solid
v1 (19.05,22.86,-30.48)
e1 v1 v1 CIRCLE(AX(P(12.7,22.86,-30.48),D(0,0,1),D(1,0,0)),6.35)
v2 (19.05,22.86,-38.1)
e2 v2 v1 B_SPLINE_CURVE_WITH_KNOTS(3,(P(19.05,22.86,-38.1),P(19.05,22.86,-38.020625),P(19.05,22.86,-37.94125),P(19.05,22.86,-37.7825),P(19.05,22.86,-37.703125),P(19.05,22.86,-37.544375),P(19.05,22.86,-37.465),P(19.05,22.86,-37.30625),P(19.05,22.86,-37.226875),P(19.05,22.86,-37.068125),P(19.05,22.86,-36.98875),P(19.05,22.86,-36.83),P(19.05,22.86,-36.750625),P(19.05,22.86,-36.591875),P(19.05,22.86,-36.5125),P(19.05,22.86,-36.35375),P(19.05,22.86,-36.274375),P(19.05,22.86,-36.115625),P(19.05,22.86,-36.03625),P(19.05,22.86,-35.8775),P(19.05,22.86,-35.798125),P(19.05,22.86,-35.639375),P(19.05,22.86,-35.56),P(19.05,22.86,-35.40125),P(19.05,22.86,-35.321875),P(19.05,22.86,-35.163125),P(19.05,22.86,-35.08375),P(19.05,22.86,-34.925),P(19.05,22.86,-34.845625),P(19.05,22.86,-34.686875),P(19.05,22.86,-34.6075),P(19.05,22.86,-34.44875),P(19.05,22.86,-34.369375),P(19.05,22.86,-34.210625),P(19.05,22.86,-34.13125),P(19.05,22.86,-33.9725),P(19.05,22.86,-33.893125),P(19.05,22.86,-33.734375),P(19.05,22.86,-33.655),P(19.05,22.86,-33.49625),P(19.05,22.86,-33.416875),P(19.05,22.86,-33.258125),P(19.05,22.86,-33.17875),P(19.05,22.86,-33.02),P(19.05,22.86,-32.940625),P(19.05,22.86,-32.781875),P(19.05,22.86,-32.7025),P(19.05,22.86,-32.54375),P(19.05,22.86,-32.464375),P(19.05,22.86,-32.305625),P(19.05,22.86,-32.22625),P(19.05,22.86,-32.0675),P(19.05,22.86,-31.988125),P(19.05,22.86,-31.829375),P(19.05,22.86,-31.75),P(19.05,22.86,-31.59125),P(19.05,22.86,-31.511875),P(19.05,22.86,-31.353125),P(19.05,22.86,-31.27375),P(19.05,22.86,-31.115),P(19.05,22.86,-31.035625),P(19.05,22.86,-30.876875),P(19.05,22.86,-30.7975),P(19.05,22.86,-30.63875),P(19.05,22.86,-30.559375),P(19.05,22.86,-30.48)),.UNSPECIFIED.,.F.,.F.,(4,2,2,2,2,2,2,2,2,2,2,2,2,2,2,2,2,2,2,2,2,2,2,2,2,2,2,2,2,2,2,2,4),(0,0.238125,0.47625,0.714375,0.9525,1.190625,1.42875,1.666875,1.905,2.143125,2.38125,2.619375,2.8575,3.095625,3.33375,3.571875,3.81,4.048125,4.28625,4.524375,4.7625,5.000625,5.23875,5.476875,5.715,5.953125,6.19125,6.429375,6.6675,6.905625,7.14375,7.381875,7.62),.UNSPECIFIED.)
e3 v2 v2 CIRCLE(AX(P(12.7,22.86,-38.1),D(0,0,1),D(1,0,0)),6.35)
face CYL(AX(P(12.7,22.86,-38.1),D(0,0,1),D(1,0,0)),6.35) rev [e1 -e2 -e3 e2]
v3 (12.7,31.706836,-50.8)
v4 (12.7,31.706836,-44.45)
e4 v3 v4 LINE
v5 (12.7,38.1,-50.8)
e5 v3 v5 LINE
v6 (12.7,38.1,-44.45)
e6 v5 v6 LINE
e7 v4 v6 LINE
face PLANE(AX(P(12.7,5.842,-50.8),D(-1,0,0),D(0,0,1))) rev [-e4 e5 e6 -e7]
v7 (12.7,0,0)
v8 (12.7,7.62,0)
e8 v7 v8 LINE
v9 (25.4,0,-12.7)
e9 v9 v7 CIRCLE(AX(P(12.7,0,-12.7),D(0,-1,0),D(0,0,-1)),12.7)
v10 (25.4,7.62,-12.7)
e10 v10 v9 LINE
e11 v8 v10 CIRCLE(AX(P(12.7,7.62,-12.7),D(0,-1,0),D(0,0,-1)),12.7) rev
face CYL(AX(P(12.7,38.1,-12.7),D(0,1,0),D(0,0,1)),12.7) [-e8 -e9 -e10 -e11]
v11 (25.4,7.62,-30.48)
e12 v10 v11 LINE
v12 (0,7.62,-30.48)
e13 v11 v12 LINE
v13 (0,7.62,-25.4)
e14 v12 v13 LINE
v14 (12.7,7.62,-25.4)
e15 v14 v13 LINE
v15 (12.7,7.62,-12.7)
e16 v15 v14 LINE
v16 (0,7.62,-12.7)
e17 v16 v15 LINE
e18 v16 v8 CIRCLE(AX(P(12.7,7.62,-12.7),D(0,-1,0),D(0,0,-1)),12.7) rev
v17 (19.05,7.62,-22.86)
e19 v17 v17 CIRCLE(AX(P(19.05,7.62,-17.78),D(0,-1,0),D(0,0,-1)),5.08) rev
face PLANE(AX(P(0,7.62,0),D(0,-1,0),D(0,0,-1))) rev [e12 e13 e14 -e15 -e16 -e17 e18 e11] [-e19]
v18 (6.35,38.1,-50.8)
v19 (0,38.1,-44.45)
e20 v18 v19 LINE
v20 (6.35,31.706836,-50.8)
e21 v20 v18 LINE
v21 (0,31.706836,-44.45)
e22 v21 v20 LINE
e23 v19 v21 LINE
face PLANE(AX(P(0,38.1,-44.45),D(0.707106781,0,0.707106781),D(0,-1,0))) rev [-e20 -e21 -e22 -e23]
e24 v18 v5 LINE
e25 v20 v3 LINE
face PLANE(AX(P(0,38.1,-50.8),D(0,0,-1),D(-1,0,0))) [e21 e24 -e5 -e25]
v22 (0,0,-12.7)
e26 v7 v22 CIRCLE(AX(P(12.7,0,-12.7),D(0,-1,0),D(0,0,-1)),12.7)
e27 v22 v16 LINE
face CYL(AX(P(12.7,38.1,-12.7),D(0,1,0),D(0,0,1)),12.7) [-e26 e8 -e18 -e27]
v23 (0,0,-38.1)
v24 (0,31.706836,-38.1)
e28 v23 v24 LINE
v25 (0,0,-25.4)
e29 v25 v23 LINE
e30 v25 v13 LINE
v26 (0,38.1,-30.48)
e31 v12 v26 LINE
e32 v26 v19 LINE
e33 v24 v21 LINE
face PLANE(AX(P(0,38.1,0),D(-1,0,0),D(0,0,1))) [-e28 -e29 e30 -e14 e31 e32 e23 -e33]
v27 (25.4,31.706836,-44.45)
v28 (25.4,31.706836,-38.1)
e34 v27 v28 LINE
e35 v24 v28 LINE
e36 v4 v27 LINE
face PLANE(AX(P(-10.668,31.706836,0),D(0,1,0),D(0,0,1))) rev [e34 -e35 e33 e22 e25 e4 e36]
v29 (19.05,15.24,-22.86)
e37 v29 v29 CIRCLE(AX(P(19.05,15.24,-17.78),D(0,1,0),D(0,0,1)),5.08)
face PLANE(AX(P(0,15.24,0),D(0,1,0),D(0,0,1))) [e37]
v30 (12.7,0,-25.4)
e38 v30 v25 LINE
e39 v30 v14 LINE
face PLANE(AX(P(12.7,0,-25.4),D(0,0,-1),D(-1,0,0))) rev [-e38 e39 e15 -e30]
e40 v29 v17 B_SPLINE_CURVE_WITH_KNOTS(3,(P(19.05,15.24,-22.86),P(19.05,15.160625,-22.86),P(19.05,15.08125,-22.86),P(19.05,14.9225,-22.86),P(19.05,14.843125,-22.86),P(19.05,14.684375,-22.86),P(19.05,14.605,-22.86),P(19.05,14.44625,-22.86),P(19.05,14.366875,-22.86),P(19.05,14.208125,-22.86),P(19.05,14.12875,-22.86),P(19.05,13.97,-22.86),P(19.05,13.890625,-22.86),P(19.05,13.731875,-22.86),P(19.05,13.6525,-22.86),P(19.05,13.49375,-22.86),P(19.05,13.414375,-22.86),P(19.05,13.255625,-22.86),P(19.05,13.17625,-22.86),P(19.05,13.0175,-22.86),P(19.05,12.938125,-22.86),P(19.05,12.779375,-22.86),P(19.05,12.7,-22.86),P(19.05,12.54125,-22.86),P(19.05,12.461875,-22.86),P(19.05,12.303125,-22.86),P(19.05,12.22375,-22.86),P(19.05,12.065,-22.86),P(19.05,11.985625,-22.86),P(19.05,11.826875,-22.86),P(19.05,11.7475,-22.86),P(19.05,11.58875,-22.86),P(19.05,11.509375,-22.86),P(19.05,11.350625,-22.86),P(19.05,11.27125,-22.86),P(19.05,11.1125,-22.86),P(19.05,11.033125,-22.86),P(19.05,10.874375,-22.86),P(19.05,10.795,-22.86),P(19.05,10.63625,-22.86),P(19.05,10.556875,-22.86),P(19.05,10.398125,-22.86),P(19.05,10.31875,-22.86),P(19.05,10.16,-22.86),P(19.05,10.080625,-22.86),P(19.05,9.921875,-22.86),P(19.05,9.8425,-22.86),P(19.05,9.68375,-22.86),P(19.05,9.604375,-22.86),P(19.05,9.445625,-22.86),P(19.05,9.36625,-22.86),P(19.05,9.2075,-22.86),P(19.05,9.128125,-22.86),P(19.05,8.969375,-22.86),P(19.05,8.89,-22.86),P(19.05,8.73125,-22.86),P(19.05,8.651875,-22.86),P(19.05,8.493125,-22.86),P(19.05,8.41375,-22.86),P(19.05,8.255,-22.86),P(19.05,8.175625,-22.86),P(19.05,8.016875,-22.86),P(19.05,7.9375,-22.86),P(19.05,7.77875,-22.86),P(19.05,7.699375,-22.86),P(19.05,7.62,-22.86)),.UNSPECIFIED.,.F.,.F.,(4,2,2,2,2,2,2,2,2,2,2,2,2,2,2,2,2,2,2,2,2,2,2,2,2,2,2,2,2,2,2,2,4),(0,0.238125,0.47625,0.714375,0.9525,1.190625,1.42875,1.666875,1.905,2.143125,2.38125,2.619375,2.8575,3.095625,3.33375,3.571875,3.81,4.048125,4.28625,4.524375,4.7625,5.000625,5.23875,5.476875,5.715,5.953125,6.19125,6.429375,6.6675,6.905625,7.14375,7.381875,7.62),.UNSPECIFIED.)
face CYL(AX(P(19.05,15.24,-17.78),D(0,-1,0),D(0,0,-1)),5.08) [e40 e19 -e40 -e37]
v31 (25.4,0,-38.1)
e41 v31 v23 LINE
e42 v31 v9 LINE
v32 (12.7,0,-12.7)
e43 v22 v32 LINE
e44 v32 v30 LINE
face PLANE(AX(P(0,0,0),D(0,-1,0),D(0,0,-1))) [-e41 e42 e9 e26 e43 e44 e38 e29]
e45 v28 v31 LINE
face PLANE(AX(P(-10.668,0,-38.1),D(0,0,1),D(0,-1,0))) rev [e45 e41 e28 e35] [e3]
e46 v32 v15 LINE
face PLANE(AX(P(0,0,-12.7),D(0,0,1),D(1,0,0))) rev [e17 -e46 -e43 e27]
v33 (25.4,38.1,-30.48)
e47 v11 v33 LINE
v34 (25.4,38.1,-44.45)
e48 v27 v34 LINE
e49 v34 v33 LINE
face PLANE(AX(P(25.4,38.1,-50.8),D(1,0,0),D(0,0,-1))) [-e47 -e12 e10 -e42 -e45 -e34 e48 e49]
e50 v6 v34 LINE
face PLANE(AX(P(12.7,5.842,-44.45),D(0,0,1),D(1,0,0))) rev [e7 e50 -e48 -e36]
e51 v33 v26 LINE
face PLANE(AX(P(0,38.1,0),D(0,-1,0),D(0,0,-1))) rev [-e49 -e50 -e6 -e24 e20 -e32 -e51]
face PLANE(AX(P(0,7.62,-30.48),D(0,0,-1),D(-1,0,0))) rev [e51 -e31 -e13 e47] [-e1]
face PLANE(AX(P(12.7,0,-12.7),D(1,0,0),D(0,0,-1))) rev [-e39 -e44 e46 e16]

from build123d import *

# Parameters (mm, degrees)
SKETCH1_W               = 25.4
SKETCH1_H               = 50.8
BOSS_EXTRUDE1_DEPTH     = 38.1
SKETCH2_W               = 25.4
SKETCH2_H               = 30.48
CUT_EXTRUDE1_DEPTH      = 30.48
CUT_EXTRUDE2_DEPTH      = 10.668
CUT_EXTRUDE2_DEPTH_BACK = 32.258
SKETCH3_W               = 12.7
SKETCH3_H               = 31.706835607
SKETCH4_W               = 12.7
SKETCH4_H               = 6.35
CUT_EXTRUDE3_DEPTH      = 32.258
CHAMFER1_SIZE           = 6.35
FILLET1_R               = 12.7
FILLET2_R               = 12.7
SKETCH8_R               = 5.08
BOSS_EXTRUDE3_DEPTH     = 7.62
SKETCH9_R               = 6.35
CUT_EXTRUDE6_DEPTH      = 7.62
SKETCH10_W              = 12.7
SKETCH10_H              = 12.7
CUT_EXTRUDE7_DEPTH      = 7.62


with BuildPart() as part:
    # Sketch1 → Boss-Extrude1 (new body)
    with BuildSketch(Plane(origin=(0, 0, 0), x_dir=(1, 0, 0), z_dir=(0, 1, 0))):
        with Locations((12.7, 25.4)):
            Rectangle(SKETCH1_W, SKETCH1_H)
    extrude(amount=BOSS_EXTRUDE1_DEPTH)

    # Sketch2 → Cut-Extrude1 (cut)
    with BuildSketch(Plane(origin=(0, 38.1, 0), x_dir=(1, 0, 0), z_dir=(0, 1, 0))):
        with Locations((12.7, 15.24)):
            Rectangle(SKETCH2_W, SKETCH2_H)
    extrude(amount=-CUT_EXTRUDE1_DEPTH, mode=Mode.SUBTRACT)

    # Sketch3 → Cut-Extrude2 (cut, two sides: drawn at the far end of the back side and taken through both)
    with BuildSketch(Plane.ZY.offset(-CUT_EXTRUDE2_DEPTH_BACK)):
        with Locations((-44.45, 15.853417804)):
            Rectangle(SKETCH3_W, SKETCH3_H)
    extrude(amount=CUT_EXTRUDE2_DEPTH + CUT_EXTRUDE2_DEPTH_BACK, mode=Mode.SUBTRACT)

    # Sketch4 → Cut-Extrude3 (cut)
    with BuildSketch(Plane(origin=(0, 38.1, 0), x_dir=(1, 0, 0), z_dir=(0, 1, 0))):
        with Locations((19.05, 47.625)):
            Rectangle(SKETCH4_W, SKETCH4_H)
    extrude(amount=-CUT_EXTRUDE3_DEPTH, mode=Mode.SUBTRACT)

    # Chamfer1
    chamfer1_edges = [part.edges().sort_by_distance(p)[0] for p in [
        (0, 34.903417804, -50.8),
    ]]
    chamfer(chamfer1_edges, length=CHAMFER1_SIZE)

    # Fillet1
    fillet1_edges = [part.edges().sort_by_distance(p)[0] for p in [
        (25.4, 3.81, 0),
    ]]
    fillet(fillet1_edges, radius=FILLET1_R)

    # Fillet2
    fillet2_edges = [part.edges().sort_by_distance(p)[0] for p in [
        (0, 3.81, 0),
    ]]
    fillet(fillet2_edges, radius=FILLET2_R - 0.0001)  # a hair under: the kernel refuses the full size

    # Sketch8 → Boss-Extrude3 (add)
    with BuildSketch(Plane(origin=(0, 7.62, 0), x_dir=(1, 0, 0), z_dir=(0, 1, 0))):
        with Locations(Location((19.05, 17.78, 0), (0, 0, 90))):
            Circle(SKETCH8_R)
    extrude(amount=BOSS_EXTRUDE3_DEPTH)

    # Sketch9 → Cut-Extrude6 (cut)
    with BuildSketch(Plane.XY.offset(-30.48)):
        with Locations((12.7, 22.86)):
            Circle(SKETCH9_R)
    extrude(amount=-CUT_EXTRUDE6_DEPTH, mode=Mode.SUBTRACT)

    # Sketch10 → Cut-Extrude7 (cut)
    with BuildSketch(Plane(origin=(0, 7.62, 0), x_dir=(1, 0, 0), z_dir=(0, 1, 0))):
        with Locations((6.35, 19.05)):
            Rectangle(SKETCH10_W, SKETCH10_H)
    extrude(amount=-CUT_EXTRUDE7_DEPTH, mode=Mode.SUBTRACT)


solid = part.part
